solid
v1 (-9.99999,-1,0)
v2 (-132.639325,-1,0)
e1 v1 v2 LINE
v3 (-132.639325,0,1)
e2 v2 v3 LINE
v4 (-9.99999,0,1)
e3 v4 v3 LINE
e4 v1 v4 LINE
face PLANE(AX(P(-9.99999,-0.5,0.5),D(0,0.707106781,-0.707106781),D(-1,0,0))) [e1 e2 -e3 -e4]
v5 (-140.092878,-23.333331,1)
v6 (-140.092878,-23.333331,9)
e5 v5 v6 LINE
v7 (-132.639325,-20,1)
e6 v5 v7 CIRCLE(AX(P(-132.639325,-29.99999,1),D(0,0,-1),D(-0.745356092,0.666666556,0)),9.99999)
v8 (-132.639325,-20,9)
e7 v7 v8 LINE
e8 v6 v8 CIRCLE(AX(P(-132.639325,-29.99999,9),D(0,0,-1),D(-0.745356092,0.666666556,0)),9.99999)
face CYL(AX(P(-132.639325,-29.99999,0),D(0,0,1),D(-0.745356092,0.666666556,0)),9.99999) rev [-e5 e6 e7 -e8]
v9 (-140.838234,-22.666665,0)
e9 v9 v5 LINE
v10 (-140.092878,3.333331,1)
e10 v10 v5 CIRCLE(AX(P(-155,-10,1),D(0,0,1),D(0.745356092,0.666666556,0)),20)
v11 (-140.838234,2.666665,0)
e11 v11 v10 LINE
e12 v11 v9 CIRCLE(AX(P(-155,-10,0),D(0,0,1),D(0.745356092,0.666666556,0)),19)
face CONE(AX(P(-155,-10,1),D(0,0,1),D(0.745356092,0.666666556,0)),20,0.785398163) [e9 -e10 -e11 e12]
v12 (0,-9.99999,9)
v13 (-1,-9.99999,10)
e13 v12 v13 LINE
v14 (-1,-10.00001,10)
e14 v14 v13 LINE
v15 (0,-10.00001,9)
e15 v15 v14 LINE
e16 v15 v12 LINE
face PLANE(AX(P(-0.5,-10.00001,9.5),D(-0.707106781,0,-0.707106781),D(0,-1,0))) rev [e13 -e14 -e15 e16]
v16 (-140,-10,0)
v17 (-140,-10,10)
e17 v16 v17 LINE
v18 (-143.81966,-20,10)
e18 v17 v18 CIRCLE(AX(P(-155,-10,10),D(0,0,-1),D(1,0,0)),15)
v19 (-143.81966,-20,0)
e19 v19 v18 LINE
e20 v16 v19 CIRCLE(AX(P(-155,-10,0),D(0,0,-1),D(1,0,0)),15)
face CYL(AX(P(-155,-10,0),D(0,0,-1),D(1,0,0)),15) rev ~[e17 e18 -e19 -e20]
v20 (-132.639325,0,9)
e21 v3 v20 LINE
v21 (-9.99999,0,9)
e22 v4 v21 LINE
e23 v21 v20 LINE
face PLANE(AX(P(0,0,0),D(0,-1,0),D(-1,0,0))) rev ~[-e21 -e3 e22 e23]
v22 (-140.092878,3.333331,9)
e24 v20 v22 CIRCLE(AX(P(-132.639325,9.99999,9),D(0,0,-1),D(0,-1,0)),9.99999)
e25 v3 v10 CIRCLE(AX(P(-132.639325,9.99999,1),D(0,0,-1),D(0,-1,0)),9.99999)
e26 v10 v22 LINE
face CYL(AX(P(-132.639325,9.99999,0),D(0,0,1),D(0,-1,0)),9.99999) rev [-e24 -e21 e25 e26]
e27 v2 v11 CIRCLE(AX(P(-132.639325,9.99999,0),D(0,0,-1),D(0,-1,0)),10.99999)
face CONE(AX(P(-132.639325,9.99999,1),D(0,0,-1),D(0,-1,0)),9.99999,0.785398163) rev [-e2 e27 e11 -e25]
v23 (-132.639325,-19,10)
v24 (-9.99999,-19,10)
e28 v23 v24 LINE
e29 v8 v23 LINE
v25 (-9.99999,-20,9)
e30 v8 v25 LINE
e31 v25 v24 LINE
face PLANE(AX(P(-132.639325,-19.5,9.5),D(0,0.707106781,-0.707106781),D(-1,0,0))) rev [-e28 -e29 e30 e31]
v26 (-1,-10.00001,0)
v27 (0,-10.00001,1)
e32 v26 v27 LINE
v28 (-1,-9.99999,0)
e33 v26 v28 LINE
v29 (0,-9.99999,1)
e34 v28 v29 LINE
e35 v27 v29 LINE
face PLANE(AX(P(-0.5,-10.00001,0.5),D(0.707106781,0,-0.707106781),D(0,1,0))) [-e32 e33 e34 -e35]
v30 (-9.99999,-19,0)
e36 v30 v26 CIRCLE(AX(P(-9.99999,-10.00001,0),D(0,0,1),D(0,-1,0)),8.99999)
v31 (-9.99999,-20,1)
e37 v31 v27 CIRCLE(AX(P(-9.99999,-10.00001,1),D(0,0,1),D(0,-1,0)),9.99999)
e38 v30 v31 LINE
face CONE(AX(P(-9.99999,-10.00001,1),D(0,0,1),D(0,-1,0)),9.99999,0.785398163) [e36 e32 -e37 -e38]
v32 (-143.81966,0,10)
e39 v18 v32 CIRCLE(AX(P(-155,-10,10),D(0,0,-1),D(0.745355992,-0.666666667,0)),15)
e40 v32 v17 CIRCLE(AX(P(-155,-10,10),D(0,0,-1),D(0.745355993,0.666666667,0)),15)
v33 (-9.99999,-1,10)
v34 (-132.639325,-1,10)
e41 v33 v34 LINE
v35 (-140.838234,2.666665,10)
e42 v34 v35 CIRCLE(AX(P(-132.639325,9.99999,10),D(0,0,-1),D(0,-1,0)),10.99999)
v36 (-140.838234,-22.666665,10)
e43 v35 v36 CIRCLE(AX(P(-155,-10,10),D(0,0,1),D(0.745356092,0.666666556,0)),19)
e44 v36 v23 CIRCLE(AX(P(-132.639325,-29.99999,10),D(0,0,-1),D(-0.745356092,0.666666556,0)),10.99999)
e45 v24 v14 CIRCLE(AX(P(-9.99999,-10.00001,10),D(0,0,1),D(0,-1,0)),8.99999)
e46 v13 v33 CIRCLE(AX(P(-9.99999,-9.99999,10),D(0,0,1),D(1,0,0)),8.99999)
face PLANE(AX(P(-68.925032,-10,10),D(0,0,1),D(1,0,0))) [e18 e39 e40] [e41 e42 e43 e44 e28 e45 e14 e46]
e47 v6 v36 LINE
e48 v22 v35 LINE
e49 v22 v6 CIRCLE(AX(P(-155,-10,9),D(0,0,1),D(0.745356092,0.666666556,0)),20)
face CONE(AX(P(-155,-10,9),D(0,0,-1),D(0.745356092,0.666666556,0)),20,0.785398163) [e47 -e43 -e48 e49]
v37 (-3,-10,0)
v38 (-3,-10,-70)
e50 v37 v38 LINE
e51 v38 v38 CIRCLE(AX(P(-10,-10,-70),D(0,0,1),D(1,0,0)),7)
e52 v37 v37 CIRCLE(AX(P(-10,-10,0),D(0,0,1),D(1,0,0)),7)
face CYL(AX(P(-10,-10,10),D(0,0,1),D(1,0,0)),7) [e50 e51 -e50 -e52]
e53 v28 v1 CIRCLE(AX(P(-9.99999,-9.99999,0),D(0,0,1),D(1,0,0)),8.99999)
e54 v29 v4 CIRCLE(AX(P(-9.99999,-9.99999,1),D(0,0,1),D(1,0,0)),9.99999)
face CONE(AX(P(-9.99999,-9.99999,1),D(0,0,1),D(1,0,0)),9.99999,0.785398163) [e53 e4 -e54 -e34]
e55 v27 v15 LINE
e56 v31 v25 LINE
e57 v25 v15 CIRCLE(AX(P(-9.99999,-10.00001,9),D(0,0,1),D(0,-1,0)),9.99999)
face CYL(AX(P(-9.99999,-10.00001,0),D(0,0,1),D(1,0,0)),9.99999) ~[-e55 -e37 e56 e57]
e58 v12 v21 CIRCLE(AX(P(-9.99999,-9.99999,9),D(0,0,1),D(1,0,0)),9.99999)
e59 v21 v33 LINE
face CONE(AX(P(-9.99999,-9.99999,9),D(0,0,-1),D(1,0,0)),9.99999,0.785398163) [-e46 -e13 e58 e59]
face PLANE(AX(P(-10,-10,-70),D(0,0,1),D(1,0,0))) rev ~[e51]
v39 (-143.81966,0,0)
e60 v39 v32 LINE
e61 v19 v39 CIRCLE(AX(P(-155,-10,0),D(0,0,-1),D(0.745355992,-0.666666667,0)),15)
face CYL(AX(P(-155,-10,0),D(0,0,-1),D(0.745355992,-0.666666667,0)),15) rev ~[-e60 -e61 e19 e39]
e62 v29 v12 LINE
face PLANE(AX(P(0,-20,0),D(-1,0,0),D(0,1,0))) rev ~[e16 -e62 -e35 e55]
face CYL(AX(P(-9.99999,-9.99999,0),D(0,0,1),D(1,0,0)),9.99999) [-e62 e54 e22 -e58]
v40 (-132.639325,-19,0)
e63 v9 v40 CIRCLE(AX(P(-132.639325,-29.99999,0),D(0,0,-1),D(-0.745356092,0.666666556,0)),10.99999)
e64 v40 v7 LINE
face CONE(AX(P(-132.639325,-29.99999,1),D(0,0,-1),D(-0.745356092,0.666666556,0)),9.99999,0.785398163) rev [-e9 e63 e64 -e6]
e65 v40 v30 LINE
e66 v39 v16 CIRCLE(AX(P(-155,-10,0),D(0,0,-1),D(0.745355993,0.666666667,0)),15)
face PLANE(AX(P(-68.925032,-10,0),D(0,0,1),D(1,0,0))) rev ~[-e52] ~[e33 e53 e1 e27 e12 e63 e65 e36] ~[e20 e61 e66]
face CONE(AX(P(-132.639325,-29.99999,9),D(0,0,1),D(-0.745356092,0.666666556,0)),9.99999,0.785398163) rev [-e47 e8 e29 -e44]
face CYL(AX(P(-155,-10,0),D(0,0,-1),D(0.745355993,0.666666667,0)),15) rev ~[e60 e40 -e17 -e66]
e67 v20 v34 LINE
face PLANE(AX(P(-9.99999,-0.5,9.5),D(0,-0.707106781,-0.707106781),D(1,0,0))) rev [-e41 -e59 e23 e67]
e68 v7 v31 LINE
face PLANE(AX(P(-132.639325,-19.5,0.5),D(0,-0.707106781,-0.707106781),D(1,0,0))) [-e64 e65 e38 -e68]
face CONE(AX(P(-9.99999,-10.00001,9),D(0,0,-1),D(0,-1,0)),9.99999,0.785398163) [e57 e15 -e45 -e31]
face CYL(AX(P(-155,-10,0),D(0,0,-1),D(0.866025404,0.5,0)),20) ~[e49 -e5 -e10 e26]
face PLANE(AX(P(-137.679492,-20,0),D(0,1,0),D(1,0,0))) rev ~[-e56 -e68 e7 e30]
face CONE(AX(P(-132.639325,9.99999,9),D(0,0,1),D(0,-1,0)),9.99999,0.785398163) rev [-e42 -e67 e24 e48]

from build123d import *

# Parameters (mm, degrees)
F0_R     = 7
F1_DEPTH = 10
F2_DEPTH = 10.001
F3_R     = 9.99999
F4_SIZE  = 1
F5_R     = 7
F6_DEPTH = 80


# Not quite as in the source:
# - a fillet or chamfer is up to 0.001 mm smaller than in the source, because OpenCascade refuses the exact size


with BuildPart() as f1:
    # F0 (on Top) → F1 (new body)
    with BuildSketch(Plane.XY):
        with BuildLine():
            Line((0, -20), (0, 0))
            Line((0, 0), (-137.6794919243, 0))
            ThreePointArc((-137.6794919243, 0), (-135.6814834742, -4.8236190979), (-135, -10))
            ThreePointArc((-135, -10), (-135.6814834742, -15.1763809021), (-137.6794919243, -20))
            Line((-137.6794919243, -20), (0, -20))
        make_face()
        with Locations((-10, -10)):
            Circle(F0_R, mode=Mode.SUBTRACT)
        with BuildLine():
            Line((-143.8196601125, 0), (-137.6794919243, 0))
            ThreePointArc((-137.6794919243, 0), (-175, -10), (-137.6794919243, -20))
            Line((-137.6794919243, -20), (-143.8196601125, -20))
            ThreePointArc((-143.8196601125, -20), (-170, -10), (-143.8196601125, 0))
        make_face()
        with BuildLine():
            ThreePointArc((-135, -10), (-135.6814834742, -4.8236190979), (-137.6794919243, 0))
            Line((-137.6794919243, 0), (-143.8196601125, 0))
            ThreePointArc((-143.8196601125, 0), (-140.9874146156, -4.6476686534), (-140, -10))
            ThreePointArc((-140, -10), (-140.9874146156, -15.3523313466), (-143.8196601125, -20))
            Line((-143.8196601125, -20), (-137.6794919243, -20))
            ThreePointArc((-137.6794919243, -20), (-135.6814834742, -15.1763809021), (-135, -10))
        make_face()
    extrude(amount=F1_DEPTH)

    # F0 (on Top) → F2 (cut, through all)
    with BuildSketch(Plane.XY):
        with BuildLine():
            Line((-165, 0), (-143.8196601125, 0))
            ThreePointArc((-143.8196601125, 0), (-170, -10), (-143.8196601125, -20))
            Line((-143.8196601125, -20), (-165, -20))
            Line((-165, -20), (-165, 0))
        make_face()
        with BuildLine():
            ThreePointArc((-140, -10), (-140.9874146156, -4.6476686534), (-143.8196601125, 0))
            Line((-143.8196601125, 0), (-165, 0))
            Line((-165, 0), (-165, -20))
            Line((-165, -20), (-143.8196601125, -20))
            ThreePointArc((-143.8196601125, -20), (-140.9874146156, -15.3523313466), (-140, -10))
        make_face()
        with Locations((-10, -10)):
            Circle(F0_R)
    extrude(amount=F2_DEPTH, mode=Mode.SUBTRACT)

    # F3 (radius 10 in the source; OpenCascade refuses exactly that, so slightly less here)
    f3_edges = [f1.edges().sort_by_distance(p)[0] for p in [
        (0, -20, 5),
        (0, 0, 5),
        (-137.679492, -20, 5),
        (-137.679492, 0, 5),
    ]]
    fillet(f3_edges, radius=F3_R)

    # F4
    f4_edges = [f1.edges().sort_by_distance(p)[0] for p in [
        (-71.319657, -20, 0),
        (-2.928929, -2.928929, 10),
        (-71.319657, -20, 10),
        (-136.721804, -20.87129, 0),
        (-2.928929, -17.071071, 0),
        (-175, -10, 0),
        (0, -10, 0),
        (-136.721804, 0.87129, 0),
        (-2.928929, -2.928929, 0),
        (-71.319657, 0, 0),
        (-136.721804, -20.87129, 10),
        (-2.928929, -17.071071, 10),
        (-175, -10, 10),
        (0, -10, 10),
        (-136.721804, 0.87129, 10),
        (-71.319657, 0, 10),
    ]]
    chamfer(f4_edges, length=F4_SIZE)

    # F5 (on face) → F6 (join)
    with BuildSketch(Plane.XY.offset(10)):
        with Locations((-10, -10)):
            Circle(F5_R)
    extrude(amount=-F6_DEPTH)


solid = f1.part
